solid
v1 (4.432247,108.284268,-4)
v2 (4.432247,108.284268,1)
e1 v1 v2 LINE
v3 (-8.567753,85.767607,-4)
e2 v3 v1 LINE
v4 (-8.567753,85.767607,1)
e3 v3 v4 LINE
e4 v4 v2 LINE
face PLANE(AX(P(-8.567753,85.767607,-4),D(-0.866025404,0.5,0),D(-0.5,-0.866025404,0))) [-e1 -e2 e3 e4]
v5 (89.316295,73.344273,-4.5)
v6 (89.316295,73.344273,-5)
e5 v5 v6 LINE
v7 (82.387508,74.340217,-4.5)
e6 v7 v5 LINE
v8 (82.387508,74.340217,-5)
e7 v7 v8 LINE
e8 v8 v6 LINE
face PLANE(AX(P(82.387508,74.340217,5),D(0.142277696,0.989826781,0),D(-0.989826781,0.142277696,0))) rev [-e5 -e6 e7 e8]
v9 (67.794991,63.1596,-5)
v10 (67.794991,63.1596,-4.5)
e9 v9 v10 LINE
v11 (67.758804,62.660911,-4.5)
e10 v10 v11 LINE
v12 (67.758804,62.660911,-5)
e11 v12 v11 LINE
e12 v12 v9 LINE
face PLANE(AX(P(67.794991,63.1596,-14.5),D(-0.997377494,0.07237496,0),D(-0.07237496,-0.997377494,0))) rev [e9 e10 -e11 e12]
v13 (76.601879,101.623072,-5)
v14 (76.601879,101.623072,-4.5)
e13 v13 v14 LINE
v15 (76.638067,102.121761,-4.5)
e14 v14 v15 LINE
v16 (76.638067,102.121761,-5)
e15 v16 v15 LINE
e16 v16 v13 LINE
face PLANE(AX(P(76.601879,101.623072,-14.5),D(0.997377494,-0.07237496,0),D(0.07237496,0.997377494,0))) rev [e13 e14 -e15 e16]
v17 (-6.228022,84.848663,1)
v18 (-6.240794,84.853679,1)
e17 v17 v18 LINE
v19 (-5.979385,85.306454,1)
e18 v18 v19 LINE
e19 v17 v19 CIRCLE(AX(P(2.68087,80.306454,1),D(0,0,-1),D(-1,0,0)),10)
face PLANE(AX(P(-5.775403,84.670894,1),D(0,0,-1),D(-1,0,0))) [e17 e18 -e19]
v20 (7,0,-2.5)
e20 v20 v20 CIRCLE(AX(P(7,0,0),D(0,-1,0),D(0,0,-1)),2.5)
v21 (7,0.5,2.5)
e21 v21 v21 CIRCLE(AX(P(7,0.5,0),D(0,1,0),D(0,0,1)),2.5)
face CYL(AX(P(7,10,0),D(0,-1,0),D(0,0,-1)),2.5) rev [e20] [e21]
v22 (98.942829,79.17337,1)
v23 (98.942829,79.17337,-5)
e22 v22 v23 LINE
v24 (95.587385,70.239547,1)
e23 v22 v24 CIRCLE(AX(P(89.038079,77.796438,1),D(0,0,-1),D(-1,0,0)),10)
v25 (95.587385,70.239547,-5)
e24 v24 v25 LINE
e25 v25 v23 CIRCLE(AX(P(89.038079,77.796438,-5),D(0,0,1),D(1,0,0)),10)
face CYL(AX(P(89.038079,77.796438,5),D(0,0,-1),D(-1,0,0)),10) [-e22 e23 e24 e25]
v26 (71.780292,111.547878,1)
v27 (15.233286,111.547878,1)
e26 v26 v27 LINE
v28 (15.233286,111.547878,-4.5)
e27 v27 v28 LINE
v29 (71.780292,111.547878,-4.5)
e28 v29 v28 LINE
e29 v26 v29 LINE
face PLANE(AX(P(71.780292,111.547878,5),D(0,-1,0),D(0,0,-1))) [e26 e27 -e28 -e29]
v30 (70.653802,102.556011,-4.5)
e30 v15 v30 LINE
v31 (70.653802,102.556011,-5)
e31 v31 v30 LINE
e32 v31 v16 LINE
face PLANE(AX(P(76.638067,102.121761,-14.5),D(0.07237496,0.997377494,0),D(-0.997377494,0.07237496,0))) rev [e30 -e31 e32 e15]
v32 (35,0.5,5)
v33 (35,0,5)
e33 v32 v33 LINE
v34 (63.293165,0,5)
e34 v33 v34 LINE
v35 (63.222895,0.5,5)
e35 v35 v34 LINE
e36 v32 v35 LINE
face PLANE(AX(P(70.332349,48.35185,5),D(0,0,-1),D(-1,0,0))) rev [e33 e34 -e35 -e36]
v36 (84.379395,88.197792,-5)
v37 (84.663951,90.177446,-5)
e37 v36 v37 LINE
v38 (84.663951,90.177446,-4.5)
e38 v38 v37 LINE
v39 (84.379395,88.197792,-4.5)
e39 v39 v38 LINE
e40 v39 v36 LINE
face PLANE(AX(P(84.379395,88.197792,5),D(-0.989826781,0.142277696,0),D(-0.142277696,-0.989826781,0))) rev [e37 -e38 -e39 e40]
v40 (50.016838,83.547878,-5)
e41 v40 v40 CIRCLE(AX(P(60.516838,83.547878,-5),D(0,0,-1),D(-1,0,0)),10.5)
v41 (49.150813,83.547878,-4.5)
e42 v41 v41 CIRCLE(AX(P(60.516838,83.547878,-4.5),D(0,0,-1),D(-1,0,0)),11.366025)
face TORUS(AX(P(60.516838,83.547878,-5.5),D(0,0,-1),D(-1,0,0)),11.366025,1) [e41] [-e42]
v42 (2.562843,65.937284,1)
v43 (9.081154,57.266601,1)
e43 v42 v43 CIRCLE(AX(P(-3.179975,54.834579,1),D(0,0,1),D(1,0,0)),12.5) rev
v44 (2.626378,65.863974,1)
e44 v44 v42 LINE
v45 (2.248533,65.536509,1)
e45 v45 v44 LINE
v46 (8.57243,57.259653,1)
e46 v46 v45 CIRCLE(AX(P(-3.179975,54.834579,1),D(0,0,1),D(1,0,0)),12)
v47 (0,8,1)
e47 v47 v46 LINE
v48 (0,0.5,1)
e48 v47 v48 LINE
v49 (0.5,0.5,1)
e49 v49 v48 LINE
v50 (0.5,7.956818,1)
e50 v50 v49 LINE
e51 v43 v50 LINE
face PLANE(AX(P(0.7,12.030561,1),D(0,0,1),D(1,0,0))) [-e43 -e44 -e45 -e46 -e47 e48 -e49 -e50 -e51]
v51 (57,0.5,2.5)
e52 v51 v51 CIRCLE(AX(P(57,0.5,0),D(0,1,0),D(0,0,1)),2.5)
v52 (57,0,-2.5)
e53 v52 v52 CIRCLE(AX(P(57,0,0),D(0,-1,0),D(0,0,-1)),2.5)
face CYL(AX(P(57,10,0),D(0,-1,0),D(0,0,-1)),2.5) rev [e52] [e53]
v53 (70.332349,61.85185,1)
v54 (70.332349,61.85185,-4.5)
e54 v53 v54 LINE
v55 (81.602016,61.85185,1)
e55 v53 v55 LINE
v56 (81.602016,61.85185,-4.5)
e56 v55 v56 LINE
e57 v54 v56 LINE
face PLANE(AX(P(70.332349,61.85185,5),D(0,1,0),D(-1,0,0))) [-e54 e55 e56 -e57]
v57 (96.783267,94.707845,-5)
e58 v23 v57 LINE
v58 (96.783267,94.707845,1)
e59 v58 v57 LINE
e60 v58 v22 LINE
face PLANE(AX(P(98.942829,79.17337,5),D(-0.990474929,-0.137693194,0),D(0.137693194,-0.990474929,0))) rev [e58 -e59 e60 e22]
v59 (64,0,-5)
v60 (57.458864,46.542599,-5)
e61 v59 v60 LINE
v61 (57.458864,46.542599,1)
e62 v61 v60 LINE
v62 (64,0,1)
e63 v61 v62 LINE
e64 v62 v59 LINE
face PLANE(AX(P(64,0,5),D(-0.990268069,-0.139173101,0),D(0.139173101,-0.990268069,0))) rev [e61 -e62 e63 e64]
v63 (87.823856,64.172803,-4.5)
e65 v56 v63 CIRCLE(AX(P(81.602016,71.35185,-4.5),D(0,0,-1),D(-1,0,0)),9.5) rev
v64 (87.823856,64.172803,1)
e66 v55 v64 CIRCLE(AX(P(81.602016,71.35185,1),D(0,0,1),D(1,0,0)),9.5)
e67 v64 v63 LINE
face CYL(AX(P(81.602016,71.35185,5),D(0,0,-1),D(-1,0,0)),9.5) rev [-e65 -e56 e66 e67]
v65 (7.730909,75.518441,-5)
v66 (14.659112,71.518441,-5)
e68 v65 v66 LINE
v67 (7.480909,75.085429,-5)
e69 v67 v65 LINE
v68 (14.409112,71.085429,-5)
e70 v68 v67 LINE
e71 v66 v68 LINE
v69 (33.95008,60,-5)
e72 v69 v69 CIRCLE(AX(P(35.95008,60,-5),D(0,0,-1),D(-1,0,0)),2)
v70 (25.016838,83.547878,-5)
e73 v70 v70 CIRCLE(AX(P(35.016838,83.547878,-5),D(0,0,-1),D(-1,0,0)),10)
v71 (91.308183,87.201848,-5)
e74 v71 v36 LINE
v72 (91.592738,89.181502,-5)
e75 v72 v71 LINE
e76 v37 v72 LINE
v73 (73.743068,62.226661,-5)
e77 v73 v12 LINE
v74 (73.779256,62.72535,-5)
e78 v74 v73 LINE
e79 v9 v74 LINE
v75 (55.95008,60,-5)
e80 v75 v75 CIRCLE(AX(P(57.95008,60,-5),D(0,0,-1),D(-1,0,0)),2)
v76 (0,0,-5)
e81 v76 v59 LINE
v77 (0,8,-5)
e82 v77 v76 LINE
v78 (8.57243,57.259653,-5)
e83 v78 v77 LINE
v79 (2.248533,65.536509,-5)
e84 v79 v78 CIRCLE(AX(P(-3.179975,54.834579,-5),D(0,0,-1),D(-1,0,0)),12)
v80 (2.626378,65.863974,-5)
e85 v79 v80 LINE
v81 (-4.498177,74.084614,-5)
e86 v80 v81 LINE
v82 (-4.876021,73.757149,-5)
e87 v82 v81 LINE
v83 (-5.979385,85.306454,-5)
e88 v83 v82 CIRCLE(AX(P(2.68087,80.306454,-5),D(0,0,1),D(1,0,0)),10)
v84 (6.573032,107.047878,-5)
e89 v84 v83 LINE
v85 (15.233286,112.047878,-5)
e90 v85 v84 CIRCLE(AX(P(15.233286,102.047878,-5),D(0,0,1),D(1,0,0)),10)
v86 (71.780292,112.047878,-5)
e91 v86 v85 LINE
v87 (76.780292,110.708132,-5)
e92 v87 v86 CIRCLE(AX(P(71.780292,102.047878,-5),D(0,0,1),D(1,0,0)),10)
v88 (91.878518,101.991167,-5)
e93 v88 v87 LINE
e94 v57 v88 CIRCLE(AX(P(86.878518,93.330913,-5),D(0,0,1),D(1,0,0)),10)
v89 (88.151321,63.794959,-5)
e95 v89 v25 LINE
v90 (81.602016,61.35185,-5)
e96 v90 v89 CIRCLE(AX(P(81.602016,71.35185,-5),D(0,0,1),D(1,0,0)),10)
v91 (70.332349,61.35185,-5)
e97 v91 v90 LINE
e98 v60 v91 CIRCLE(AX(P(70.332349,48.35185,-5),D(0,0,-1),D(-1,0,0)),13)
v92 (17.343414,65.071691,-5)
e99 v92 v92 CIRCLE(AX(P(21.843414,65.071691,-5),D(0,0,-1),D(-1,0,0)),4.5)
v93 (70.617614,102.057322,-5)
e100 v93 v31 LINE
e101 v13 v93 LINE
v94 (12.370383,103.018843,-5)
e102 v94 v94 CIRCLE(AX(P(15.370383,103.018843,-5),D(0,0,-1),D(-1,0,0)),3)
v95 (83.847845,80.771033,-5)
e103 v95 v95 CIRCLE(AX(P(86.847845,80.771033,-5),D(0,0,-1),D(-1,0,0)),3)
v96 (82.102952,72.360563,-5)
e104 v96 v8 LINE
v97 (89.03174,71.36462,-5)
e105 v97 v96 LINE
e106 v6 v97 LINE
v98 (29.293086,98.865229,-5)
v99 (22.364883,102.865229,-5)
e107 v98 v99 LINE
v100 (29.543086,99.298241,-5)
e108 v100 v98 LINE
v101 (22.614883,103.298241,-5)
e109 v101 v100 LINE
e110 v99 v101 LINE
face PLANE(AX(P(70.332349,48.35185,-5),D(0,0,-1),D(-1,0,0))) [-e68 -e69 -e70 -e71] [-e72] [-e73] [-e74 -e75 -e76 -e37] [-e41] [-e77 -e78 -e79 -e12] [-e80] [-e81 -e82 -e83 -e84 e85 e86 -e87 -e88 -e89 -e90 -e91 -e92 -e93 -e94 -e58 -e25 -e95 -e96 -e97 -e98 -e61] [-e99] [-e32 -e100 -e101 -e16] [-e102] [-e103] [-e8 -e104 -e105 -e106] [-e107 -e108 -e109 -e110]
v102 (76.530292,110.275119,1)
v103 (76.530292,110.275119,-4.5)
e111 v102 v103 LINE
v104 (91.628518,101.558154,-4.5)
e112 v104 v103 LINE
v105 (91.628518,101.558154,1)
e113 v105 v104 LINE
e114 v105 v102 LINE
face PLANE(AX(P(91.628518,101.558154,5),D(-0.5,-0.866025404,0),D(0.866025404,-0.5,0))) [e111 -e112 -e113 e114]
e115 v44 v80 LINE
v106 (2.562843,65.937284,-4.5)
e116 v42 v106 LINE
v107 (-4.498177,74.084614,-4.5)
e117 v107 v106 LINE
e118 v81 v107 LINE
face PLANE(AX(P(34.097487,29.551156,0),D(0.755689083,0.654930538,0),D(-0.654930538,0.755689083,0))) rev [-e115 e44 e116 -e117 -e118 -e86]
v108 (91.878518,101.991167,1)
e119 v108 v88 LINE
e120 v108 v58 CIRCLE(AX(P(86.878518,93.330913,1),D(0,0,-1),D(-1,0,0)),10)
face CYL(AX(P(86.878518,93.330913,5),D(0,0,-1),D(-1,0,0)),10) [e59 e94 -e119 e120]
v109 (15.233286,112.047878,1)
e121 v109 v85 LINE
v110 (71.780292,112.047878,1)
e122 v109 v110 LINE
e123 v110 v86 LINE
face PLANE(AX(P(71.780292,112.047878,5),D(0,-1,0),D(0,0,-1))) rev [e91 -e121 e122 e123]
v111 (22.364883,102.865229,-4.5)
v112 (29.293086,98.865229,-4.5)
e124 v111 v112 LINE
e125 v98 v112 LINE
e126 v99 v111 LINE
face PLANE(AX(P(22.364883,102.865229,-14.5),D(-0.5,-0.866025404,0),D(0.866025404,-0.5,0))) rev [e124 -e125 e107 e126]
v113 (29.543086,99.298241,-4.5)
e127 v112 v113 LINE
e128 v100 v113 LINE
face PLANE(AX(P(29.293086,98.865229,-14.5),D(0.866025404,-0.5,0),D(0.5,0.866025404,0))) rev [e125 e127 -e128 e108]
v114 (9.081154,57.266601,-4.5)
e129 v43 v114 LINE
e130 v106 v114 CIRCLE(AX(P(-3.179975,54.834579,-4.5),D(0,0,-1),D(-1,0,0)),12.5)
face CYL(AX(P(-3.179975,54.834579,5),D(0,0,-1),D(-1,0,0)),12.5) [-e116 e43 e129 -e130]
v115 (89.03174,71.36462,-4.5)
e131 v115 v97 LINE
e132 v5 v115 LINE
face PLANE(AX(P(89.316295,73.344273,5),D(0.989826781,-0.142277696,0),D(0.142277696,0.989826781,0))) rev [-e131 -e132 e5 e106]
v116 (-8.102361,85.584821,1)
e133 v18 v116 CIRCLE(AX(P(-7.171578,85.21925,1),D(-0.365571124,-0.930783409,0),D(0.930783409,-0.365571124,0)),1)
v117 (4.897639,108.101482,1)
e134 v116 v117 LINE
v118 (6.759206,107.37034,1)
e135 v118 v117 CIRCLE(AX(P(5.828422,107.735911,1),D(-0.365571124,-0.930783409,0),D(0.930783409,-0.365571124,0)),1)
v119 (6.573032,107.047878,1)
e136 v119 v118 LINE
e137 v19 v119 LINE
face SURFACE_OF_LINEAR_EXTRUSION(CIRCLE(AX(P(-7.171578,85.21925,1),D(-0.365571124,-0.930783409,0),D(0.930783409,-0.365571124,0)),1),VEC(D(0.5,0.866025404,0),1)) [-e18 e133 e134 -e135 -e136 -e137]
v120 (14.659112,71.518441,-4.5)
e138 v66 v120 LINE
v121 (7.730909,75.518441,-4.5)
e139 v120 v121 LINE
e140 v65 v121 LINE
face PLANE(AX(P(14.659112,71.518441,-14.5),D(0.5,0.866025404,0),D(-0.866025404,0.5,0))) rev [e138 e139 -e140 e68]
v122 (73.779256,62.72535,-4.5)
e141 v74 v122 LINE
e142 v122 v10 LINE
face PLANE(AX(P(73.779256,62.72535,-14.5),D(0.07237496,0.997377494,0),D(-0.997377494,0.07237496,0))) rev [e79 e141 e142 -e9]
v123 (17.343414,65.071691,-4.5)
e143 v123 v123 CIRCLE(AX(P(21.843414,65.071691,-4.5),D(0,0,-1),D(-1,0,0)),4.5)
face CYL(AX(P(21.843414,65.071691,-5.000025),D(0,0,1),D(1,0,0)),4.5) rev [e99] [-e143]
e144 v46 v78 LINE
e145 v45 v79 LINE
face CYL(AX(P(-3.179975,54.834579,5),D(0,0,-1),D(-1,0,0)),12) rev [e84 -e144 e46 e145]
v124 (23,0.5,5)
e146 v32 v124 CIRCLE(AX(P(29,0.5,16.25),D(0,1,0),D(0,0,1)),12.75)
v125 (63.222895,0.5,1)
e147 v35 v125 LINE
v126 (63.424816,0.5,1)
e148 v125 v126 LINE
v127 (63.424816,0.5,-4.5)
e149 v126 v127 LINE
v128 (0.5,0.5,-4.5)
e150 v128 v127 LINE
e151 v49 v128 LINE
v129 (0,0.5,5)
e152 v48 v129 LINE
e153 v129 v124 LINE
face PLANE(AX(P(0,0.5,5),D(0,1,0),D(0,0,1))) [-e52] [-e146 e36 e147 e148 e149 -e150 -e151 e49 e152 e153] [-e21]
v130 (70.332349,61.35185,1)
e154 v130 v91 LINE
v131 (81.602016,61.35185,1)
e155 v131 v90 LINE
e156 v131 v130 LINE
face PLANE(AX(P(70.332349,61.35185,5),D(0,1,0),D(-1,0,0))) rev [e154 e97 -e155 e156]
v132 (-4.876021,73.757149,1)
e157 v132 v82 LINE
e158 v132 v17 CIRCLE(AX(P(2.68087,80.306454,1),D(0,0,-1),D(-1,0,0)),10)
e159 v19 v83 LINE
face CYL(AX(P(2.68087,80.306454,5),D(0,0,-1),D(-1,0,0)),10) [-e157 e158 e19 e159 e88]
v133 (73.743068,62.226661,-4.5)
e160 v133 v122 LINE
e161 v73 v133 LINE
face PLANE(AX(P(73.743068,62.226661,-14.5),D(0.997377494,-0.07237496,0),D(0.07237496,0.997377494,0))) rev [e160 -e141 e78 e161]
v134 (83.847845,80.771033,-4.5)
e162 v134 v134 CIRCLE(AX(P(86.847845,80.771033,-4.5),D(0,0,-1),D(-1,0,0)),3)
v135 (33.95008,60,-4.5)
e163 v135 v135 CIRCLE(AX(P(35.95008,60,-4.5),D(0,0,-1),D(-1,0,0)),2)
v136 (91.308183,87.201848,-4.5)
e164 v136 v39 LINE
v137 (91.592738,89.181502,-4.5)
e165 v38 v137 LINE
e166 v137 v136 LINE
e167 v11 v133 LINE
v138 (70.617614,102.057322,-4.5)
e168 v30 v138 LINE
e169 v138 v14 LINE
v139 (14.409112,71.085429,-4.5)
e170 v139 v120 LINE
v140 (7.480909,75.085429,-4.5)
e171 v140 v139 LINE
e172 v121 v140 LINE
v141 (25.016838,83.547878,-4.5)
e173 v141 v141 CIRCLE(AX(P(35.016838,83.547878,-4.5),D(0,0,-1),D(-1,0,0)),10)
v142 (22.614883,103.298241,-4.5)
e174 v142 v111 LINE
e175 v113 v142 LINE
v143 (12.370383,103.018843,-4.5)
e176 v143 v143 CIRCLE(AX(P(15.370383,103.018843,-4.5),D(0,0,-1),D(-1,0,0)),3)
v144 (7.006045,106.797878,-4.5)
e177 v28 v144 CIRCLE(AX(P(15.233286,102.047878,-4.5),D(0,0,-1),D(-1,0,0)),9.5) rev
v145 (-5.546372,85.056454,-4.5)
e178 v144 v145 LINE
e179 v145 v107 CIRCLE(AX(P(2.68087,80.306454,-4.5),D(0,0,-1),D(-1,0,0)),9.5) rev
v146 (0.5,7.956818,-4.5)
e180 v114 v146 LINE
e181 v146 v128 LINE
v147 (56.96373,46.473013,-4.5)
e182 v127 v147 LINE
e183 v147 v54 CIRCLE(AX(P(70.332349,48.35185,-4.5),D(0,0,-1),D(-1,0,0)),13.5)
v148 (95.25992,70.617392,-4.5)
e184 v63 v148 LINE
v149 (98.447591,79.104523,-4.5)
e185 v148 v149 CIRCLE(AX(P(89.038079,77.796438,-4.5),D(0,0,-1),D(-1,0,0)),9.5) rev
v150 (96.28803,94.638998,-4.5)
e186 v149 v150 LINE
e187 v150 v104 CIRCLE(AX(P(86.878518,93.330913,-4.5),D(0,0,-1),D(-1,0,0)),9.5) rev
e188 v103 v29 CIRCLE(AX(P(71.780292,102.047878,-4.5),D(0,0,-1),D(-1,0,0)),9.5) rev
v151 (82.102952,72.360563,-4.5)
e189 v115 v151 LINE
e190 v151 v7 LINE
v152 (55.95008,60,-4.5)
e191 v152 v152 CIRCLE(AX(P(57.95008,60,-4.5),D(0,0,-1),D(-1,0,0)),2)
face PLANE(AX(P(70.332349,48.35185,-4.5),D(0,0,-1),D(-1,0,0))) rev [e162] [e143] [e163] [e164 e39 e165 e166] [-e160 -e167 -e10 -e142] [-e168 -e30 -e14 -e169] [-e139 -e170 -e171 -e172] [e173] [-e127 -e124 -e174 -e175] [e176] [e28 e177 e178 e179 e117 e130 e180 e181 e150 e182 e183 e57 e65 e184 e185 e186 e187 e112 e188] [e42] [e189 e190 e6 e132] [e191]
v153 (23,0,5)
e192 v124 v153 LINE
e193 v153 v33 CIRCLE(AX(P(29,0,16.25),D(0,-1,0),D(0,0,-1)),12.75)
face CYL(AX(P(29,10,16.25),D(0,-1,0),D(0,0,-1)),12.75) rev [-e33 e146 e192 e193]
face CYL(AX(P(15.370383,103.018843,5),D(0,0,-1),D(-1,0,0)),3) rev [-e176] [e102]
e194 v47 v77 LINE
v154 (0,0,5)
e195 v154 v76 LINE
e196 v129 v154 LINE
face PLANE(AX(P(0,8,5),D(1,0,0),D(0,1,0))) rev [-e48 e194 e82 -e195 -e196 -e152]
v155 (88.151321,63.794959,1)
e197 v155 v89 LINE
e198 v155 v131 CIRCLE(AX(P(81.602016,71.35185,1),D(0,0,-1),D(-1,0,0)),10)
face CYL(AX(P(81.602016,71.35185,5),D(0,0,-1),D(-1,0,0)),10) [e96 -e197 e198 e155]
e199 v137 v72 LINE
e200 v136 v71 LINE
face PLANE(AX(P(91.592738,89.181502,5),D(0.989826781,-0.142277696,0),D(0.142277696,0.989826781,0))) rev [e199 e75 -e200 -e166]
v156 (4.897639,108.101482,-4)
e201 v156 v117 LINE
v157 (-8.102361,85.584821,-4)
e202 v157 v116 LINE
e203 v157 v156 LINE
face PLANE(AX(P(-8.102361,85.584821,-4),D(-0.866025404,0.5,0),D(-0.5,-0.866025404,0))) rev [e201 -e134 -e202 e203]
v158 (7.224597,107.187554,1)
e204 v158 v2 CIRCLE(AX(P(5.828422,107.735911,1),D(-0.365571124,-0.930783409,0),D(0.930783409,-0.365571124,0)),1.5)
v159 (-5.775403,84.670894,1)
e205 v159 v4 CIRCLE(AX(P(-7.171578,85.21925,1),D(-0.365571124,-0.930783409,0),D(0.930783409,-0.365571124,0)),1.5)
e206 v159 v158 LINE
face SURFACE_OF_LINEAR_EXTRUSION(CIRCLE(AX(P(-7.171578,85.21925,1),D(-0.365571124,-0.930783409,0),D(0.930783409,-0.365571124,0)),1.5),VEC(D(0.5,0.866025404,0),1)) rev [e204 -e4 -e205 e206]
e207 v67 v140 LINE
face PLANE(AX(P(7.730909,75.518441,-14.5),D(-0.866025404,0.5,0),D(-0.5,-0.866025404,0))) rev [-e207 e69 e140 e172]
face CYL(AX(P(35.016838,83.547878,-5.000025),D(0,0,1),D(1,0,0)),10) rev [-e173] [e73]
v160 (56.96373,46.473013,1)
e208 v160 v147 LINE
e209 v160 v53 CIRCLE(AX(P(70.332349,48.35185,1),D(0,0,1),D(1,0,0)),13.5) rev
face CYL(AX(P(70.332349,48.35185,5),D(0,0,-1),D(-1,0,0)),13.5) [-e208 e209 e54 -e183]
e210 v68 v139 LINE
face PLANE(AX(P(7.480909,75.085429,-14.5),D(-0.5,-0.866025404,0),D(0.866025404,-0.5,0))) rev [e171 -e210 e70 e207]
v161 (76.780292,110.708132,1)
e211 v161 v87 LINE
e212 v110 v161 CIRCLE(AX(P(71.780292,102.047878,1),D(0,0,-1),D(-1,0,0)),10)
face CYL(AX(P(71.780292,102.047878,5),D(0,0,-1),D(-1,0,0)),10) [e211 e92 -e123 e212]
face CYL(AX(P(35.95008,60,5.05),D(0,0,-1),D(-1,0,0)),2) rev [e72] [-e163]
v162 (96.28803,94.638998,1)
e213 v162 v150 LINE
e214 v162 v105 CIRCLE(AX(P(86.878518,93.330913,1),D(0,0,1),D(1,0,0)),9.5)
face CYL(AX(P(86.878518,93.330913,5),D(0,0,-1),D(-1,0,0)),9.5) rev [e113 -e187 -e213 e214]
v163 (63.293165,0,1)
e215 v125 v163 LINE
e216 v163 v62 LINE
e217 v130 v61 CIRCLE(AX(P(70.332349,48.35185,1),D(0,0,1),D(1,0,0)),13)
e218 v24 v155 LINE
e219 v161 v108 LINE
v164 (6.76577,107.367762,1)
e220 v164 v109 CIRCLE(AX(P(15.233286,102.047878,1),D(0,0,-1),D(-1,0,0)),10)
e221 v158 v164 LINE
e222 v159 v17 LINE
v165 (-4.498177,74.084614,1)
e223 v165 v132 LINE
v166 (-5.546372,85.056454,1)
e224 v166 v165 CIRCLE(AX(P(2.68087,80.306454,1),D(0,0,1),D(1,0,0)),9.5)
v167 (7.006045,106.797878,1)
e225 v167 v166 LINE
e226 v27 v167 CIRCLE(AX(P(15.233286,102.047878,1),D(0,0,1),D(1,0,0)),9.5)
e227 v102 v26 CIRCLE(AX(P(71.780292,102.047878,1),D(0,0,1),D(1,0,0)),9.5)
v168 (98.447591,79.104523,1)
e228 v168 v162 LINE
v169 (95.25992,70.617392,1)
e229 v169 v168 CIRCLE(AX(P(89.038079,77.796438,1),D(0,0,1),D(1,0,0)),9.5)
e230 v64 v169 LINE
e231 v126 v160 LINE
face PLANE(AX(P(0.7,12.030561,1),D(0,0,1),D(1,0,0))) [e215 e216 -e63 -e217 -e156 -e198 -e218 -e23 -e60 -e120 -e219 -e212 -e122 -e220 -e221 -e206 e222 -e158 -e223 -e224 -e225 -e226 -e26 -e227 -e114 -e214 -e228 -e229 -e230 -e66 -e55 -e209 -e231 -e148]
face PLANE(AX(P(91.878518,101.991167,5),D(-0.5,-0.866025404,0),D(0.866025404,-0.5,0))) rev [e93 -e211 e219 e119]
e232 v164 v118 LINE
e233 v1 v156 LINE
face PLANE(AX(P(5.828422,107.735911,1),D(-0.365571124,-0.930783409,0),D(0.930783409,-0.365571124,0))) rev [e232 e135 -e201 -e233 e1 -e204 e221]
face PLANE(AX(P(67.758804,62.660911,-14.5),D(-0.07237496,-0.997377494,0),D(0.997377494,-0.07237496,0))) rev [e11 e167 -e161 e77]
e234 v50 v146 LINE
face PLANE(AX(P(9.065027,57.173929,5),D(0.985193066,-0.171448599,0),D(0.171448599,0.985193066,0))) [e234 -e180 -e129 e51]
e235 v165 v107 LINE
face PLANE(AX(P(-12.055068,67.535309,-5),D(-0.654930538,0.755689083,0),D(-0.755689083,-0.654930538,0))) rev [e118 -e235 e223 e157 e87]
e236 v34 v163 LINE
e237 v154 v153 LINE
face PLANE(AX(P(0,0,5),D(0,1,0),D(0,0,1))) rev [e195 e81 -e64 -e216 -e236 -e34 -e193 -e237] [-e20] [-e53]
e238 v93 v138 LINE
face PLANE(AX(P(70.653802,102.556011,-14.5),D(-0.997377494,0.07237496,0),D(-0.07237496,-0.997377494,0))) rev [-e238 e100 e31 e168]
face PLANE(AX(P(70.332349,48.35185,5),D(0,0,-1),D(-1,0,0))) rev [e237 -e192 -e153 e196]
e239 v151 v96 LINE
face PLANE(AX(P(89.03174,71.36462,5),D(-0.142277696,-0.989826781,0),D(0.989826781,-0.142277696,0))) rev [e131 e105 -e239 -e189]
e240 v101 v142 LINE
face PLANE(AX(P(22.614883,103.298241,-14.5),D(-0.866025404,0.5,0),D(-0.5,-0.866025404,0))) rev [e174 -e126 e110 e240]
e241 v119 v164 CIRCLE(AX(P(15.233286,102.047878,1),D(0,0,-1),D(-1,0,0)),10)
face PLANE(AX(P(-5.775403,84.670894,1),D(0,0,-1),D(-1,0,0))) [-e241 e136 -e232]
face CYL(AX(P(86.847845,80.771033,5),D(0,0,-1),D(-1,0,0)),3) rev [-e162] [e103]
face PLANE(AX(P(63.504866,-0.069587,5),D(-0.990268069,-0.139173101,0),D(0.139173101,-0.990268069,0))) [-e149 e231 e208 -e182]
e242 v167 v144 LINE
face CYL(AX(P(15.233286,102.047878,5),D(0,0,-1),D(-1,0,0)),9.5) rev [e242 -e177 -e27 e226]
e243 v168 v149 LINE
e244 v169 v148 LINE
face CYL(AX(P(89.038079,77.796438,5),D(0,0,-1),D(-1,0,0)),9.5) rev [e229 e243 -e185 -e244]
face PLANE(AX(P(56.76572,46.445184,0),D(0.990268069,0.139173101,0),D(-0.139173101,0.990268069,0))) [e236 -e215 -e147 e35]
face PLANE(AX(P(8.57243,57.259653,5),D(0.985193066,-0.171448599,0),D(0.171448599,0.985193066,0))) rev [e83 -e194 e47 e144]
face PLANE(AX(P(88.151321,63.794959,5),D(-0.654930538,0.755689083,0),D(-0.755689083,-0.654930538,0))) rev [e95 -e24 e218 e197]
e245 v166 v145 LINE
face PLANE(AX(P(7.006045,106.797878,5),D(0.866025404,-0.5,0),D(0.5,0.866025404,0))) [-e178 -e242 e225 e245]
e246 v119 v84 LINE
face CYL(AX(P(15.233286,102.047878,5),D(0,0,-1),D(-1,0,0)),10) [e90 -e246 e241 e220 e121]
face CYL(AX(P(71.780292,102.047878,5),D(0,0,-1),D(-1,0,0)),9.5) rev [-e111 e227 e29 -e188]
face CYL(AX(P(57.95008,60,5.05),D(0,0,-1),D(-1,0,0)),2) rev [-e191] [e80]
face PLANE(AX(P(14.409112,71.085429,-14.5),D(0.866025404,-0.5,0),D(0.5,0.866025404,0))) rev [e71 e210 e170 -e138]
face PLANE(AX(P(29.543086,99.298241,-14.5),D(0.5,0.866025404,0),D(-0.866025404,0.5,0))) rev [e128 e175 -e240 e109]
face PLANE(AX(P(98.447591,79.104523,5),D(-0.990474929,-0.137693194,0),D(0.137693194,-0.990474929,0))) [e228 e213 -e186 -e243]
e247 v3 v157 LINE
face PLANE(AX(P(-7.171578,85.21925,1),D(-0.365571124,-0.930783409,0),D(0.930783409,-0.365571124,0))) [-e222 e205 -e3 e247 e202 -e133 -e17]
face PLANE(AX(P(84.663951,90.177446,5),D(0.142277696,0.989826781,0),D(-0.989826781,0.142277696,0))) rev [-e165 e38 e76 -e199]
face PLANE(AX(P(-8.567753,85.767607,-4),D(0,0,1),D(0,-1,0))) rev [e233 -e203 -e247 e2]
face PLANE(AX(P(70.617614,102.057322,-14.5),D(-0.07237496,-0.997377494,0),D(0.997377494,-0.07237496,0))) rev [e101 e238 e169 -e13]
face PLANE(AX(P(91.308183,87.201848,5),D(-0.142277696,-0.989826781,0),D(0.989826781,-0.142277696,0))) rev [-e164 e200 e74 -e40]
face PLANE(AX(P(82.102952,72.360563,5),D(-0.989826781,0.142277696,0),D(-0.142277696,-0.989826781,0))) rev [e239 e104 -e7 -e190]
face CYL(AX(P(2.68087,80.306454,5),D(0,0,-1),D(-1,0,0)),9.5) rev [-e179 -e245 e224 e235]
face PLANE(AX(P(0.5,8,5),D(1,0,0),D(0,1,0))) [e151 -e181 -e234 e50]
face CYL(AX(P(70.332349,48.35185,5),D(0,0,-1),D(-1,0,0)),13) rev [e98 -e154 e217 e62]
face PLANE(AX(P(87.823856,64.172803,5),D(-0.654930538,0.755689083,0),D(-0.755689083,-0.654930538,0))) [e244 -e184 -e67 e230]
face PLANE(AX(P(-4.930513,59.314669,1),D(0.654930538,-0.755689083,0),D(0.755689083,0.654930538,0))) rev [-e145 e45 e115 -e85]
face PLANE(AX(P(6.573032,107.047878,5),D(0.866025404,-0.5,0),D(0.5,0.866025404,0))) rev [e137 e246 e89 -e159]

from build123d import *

# Parameters (mm, degrees)
BOSS_EXTRUDE1_DEPTH         = 5
SHELL1_T                    = -0.5
SKETCH4_R                   = 2.5
CUT_EXTRUDE4_DEPTH          = 10
CUT_SWEEP2_START            = 1
CUT_SWEEP2_DEPTH            = 4
SKETCH8_W                   = 6
SKETCH8_H                   = 10.878336181
CUT_EXTRUDE6_DEPTH          = 10
SKETCH11_R                  = 4.5
SKETCH11_R_2                = 10.5
SKETCH11_R_3                = 10
CUT_EXTRUDE7_DEPTH          = 150.877510373
FILLET1_R                   = 1
BOSS_EXTRUDE6_START         = 69.993050043
BOSS_EXTRUDE6_DEPTH         = 26.446393474
BOSS_EXTRUDE6_START_2       = -40
BOSS_EXTRUDE6_2_OUTLINE_W   = 1.69894254
BOSS_EXTRUDE6_2_OUTLINE_H   = 3
BOSS_EXTRUDE6_2_OUTLINE_W_2 = 1.590498846
BOSS_EXTRUDE6_2_OUTLINE_H_2 = 10
BOSS_EXTRUDE6_2_DEPTH       = 7.043773978
BOSS_EXTRUDE6_3_OUTLINE_W   = 1.69894254
BOSS_EXTRUDE6_3_OUTLINE_H   = 7
BOSS_EXTRUDE6_3_DEPTH       = 3.122658049
BOSS_EXTRUDE6_START_3       = -33.015543653
BOSS_EXTRUDE6_4_OUTLINE_W   = 1.590498846
BOSS_EXTRUDE6_4_OUTLINE_H   = 3
BOSS_EXTRUDE6_4_DEPTH       = 2.015543653
SKETCH17_R                  = 3
CUT_EXTRUDE8_DEPTH          = 10
CUT_EXTRUDE9_DEPTH          = 10
SKETCH19_R                  = 2
CUT_EXTRUDE10_DEPTH         = 150.877510373
CUT_EXTRUDE11_DEPTH         = 10


with BuildPart() as part:
    # Sketch1 → Boss-Extrude1 (new, symmetric)
    with BuildSketch(Plane.XY):
        with BuildLine():
            Line((0, 0), (64, 0))
            Line((64, 0), (57.458864255, 46.542599231))
            ThreePointArc((57.458864255, 46.542599231), (60.521124606, 56.88061692), (70.332349149, 61.351849543))
            Line((70.332349149, 61.351849543), (81.602015886, 61.351849543))
            ThreePointArc((81.602015886, 61.351849543), (85.0970904, 61.9825137), (88.15132127, 63.794958715))
            Line((88.15132127, 63.794958715), (95.587384775, 70.239547086))
            ThreePointArc((95.587384775, 70.239547086), (98.399557697, 74.280371374), (98.942828678, 79.173369852))
            Line((98.942828678, 79.173369852), (96.783267224, 94.707844854))
            ThreePointArc((96.783267224, 94.707844854), (95.173069343, 98.916646259), (91.878517937, 101.991166954))
            Line((91.878517937, 101.991166954), (76.780291664, 110.708131957))
            ThreePointArc((76.780291664, 110.708131957), (74.368482115, 111.707136182), (71.780291664, 112.047877919))
            Line((71.780291664, 112.047877919), (15.23328628, 112.047877919))
            ThreePointArc((15.23328628, 112.047877919), (10.23328628, 110.708131957), (6.573032242, 107.047877919))
            Line((6.573032242, 107.047877919), (-5.979384502, 85.30645436))
            ThreePointArc((-5.979384502, 85.30645436), (-7.273805779, 79.355434178), (-4.876021292, 73.757148976))
            Line((-4.876021292, 73.757148976), (2.24853328, 65.536509085))
            ThreePointArc((2.24853328, 65.536509085), (6.355355668, 62.120008219), (8.572429973, 57.259653311))
            Line((8.572429973, 57.259653311), (0, 8))
            Line((0, 8), (0, 0))
        make_face()
    extrude(amount=BOSS_EXTRUDE1_DEPTH, both=True)

    # Shell1
    shell1_openings = [part.faces().sort_by_distance(p)[0] for p in [
        (40.493150865, 62.038987827, 5),
    ]]
    offset(amount=SHELL1_T, openings=shell1_openings, kind=Kind.INTERSECTION)

    # Sketch4 → Cut-Extrude4 (cut)
    with BuildSketch(Plane.XZ):
        with Locations(Location((7, 0, 0), (0, 0, 270))):
            Circle(SKETCH4_R)
        with Locations(Location((57, 0, 0), (0, 0, 270))):
            Circle(SKETCH4_R)
        with BuildLine():
            Line((23, 5), (35, 5))
            ThreePointArc((35, 5), (29, 3.5), (23, 5))
        make_face()
    extrude(amount=-CUT_EXTRUDE4_DEPTH, mode=Mode.SUBTRACT)

    # Cut-Sweep2: read off the stored shape, not the designer's step
    # Cut-Sweep2 outline → Cut-Sweep2 (cut)
    with BuildSketch(Plane.XY.offset(CUT_SWEEP2_START)):
        with BuildLine():
            Line((63.222895016, 0.5), (63.293165433, 0))
            Line((63.293165433, 0), (64, 0))
            Line((64, 0), (57.458864255, 46.542599231))
            ThreePointArc((57.458864255, 46.542599231), (60.521124606, 56.88061692), (70.332349149, 61.351849543))
            Line((70.332349149, 61.351849543), (81.602015886, 61.351849543))
            ThreePointArc((81.602015886, 61.351849543), (85.0970904, 61.9825137), (88.15132127, 63.794958715))
            Line((88.15132127, 63.794958715), (95.587384775, 70.239547086))
            ThreePointArc((95.587384775, 70.239547086), (98.399557697, 74.280371374), (98.942828678, 79.173369852))
            Line((98.942828678, 79.173369852), (96.783267224, 94.707844854))
            ThreePointArc((96.783267224, 94.707844854), (95.173069343, 98.916646258), (91.878517937, 101.991166954))
            Line((91.878517937, 101.991166954), (76.780291664, 110.708131957))
            ThreePointArc((76.780291664, 110.708131957), (74.368482115, 111.707136182), (71.780291664, 112.047877919))
            Line((71.780291664, 112.047877919), (15.23328628, 112.047877919))
            ThreePointArc((15.23328628, 112.047877919), (10.23328628, 110.708131957), (6.573032242, 107.047877919))
            Line((6.573032242, 107.047877919), (-5.979384502, 85.30645436))
            ThreePointArc((-5.979384502, 85.30645436), (-7.273805779, 79.355434178), (-4.876021292, 73.757148976))
            Line((-4.876021292, 73.757148976), (2.24853328, 65.536509085))
            ThreePointArc((2.24853328, 65.536509085), (6.355355668, 62.120008219), (8.572429973, 57.259653311))
            Line((8.572429973, 57.259653311), (0, 8))
            Line((0, 8), (0, 0.5))
            Line((0, 0.5), (0.5, 0.5))
            Line((0.5, 0.5), (0.5, 7.956818155))
            Line((0.5, 7.956818155), (9.081153751, 57.266600812))
            ThreePointArc((9.081153751, 57.266600812), (6.811556982, 62.345857113), (2.562843108, 65.937283639))
            Line((2.562843108, 65.937283639), (-4.498176751, 74.084614245))
            ThreePointArc((-4.498176751, 74.084614245), (-6.776072013, 79.402985187), (-5.5463718, 85.05645436))
            Line((-5.5463718, 85.05645436), (7.006044944, 106.797877919))
            ThreePointArc((7.006044944, 106.797877919), (10.48328628, 110.275119255), (15.23328628, 111.547877919))
            Line((15.23328628, 111.547877919), (71.780291664, 111.547877919))
            ThreePointArc((71.780291664, 111.547877919), (74.239072592, 111.224173269), (76.530291664, 110.275119255))
            Line((76.530291664, 110.275119255), (91.628517937, 101.558154252))
            ThreePointArc((91.628517937, 101.558154252), (94.758341773, 98.637359591), (96.28802976, 94.638998257))
            Line((96.28802976, 94.638998257), (98.447591213, 79.104523255))
            ThreePointArc((98.447591213, 79.104523255), (97.931483782, 74.456174701), (95.259919506, 70.617391628))
            Line((95.259919506, 70.617391628), (87.823856001, 64.172803257))
            ThreePointArc((87.823856001, 64.172803257), (84.922336675, 62.450980492), (81.602015886, 61.851849543))
            Line((81.602015886, 61.851849543), (70.332349149, 61.851849543))
            ThreePointArc((70.332349149, 61.851849543), (60.143769816, 57.208646435), (56.963730221, 46.47301268))
            Line((56.963730221, 46.47301268), (63.424815796, 0.5))
            Line((63.424815796, 0.5), (63.222895016, 0.5))
        make_face()
    extrude(amount=CUT_SWEEP2_DEPTH, mode=Mode.SUBTRACT)

    # Sketch8 → Cut-Extrude6 (cut)
    with BuildSketch(Plane(origin=(34.097487332, 29.551155688, 0), x_dir=(0, 0, -1), z_dir=(0.7556890827898172, 0.6549305384178423, 0))):
        with Locations((2, 53.491759419)):
            Rectangle(SKETCH8_W, SKETCH8_H)
    extrude(amount=-CUT_EXTRUDE6_DEPTH, mode=Mode.SUBTRACT)

    # Sketch11 → Cut-Extrude7 (cut, through all)
    with BuildSketch(Plane.XY.offset(5)):
        with Locations(Location((21.843413851, 65.071690598, 0), (0, 0, 180))):
            Circle(SKETCH11_R)
        with Locations(Location((60.516838143, 83.547877919, 0), (0, 0, 180))):
            Circle(SKETCH11_R_2)
        with Locations(Location((35.016838143, 83.547877919, 0), (0, 0, 180))):
            Circle(SKETCH11_R_3)
    extrude(amount=-CUT_EXTRUDE7_DEPTH, mode=Mode.SUBTRACT)

    # Fillet1
    # the kernel refuses this fillet: 1 mm, written as the material it takes off along each edge
    with BuildSketch(Plane(origin=(60.516838143, 83.547877919, -4.5), x_dir=(-1, 0, 0), z_dir=(0, 1, 0))) as fillet1_piece_1:
        with BuildLine():
            CenterArc((11.366025404, -1), FILLET1_R, 90, 60)
            Line((11.366025404, 0), (11.366025404, 0.02))
            Line((11.366025404, 0.02), (10.5, 0.02))
            Line((10.5, 0.02), (10.48, 0))
            ThreePointArc((10.48, 0), (10.48, -0.25), (10.482679492, -0.49))
            Line((10.482679492, -0.49), (10.5, -0.5))
        make_face()
    revolve(axis=Axis((60.516838143, 83.547877919, -4.5), (0, 0, 1)), mode=Mode.SUBTRACT)

    # Boss-Extrude6: read off the stored shape, not the designer's step
    # Boss-Extrude6 outline → Boss-Extrude6 (add)
    with BuildSketch(Plane(origin=(0, 0, 0), x_dir=(0.8660254037844399, -0.4999999999999979, 0), z_dir=(0.4999999999999979, 0.8660254037844398, 0)).offset(BOSS_EXTRUDE6_START)):
        with BuildLine():
            add(Edge.make_bspline(
                [(-47.337092239, -1), (-47.337092239, -2.5), (-48.820393697, -2.5), (-50.303695156, -2.5), (-50.303695156, -1)],
                knots=[0, 0, 0, 1.570796327, 1.570796327, 3.141592654, 3.141592654, 3.141592654], degree=2, weights=[1, 0.707106781, 1, 0.707106781, 1]))
            Line((-47.337092239, -1), (-47.831526058, -1))
            add(Edge.make_bspline(
                [(-47.831526058, -1), (-47.831526058, -2), (-48.820393697, -2), (-49.809261336, -2), (-49.809261336, -1)],
                knots=[0, 0, 0, 1.570796327, 1.570796327, 3.141592654, 3.141592654, 3.141592654], degree=2, weights=[1, 0.707106781, 1, 0.707106781, 1]))
            Line((-49.809261336, -1), (-49.809261336, 4))
            Line((-49.809261336, 4), (-50.303695156, 4))
            Line((-50.303695156, 4), (-50.303695156, -1))
        make_face()
    extrude(amount=BOSS_EXTRUDE6_DEPTH)

    # Boss-Extrude6 2 outline → Boss-Extrude6 2 (cut)
    with BuildSketch(Plane(origin=(0, 0, 0), x_dir=(0.365571123575949, 0.9307834085368187, 0), z_dir=(0.9307834085368187, -0.36557112357594895, 0)).offset(BOSS_EXTRUDE6_START_2)):
        with Locations((75.84947127, 2.5)):
            Rectangle(BOSS_EXTRUDE6_2_OUTLINE_W, BOSS_EXTRUDE6_2_OUTLINE_H)
        with Locations((103.204750577, -1)):
            Rectangle(BOSS_EXTRUDE6_2_OUTLINE_W_2, BOSS_EXTRUDE6_2_OUTLINE_H_2)
    extrude(amount=BOSS_EXTRUDE6_2_DEPTH, mode=Mode.SUBTRACT)

    # Boss-Extrude6 3 outline → Boss-Extrude6 3 (cut)
    with BuildSketch(Plane(origin=(0, 0, 0), x_dir=(0.365571123575949, 0.9307834085368187, 0), z_dir=(0.9307834085368187, -0.36557112357594895, 0)).offset(BOSS_EXTRUDE6_START_2)):
        with Locations((75.84947127, -2.5)):
            Rectangle(BOSS_EXTRUDE6_3_OUTLINE_W, BOSS_EXTRUDE6_3_OUTLINE_H)
    extrude(amount=BOSS_EXTRUDE6_3_DEPTH, mode=Mode.SUBTRACT)

    # Boss-Extrude6 4 outline → Boss-Extrude6 4 (cut)
    with BuildSketch(Plane(origin=(0, 0, 0), x_dir=(0.365571123575949, 0.9307834085368187, 0), z_dir=(0.9307834085368187, -0.36557112357594895, 0)).offset(BOSS_EXTRUDE6_START_3)):
        with Locations((103.204750577, 2.5)):
            Rectangle(BOSS_EXTRUDE6_4_OUTLINE_W, BOSS_EXTRUDE6_4_OUTLINE_H)
    extrude(amount=BOSS_EXTRUDE6_4_DEPTH, mode=Mode.SUBTRACT)

    # Sketch17 → Cut-Extrude8 (cut)
    with BuildSketch(Plane(origin=(0, 0, -5), x_dir=(-1, 0, 0), z_dir=(0, 0, -1))):
        with Locations((-86.847845229, 80.771032583)):
            Circle(SKETCH17_R)
        with Locations((-15.370383265, 103.018842591)):
            Circle(SKETCH17_R)
    extrude(amount=-CUT_EXTRUDE8_DEPTH, mode=Mode.SUBTRACT)

    # Sketch18 → Cut-Extrude9 (cut)
    with BuildSketch(Plane.XY.offset(-4.5)):
        Polygon((67.794990984, 63.159599672), (67.758803504, 62.660910926), (73.743068466, 62.226661163), (73.779255946, 62.72534991), align=None)
        Polygon((76.601879403, 101.623072167), (76.638066884, 102.121760914), (70.653801921, 102.556010677), (70.617614441, 102.05732193), align=None)
        Polygon((22.614883225, 103.298241446), (22.364883225, 102.865228744), (29.293086455, 98.865228744), (29.543086455, 99.298241446), align=None)
        Polygon((14.659111859, 71.518441227), (7.730908628, 75.518441227), (7.480908628, 75.085428525), (14.409111859, 71.085428525), align=None)
    extrude(amount=-CUT_EXTRUDE9_DEPTH, mode=Mode.SUBTRACT)

    # Sketch19 → Cut-Extrude10 (cut, through all)
    with BuildSketch(Plane(origin=(0, 0, -5), x_dir=(-1, 0, 0), z_dir=(0, 0, -1))):
        with Locations((-57.950079932, 60)):
            Circle(SKETCH19_R)
        with Locations((-35.950079932, 60)):
            Circle(SKETCH19_R)
    extrude(amount=-CUT_EXTRUDE10_DEPTH, mode=Mode.SUBTRACT)

    # Sketch20 → Cut-Extrude11 (cut)
    with BuildSketch(Plane(origin=(0, 0, -5), x_dir=(-1, 0, 0), z_dir=(0, 0, -1))):
        Polygon((-91.592738232, 89.181501678), (-91.308182839, 87.201848115), (-84.379395369, 88.19779199), (-84.663950762, 90.177445553), align=None)
        Polygon((-89.316295089, 73.344273176), (-89.031739697, 71.364619614), (-82.102952227, 72.360563488), (-82.38750762, 74.340217051), align=None)
    extrude(amount=-CUT_EXTRUDE11_DEPTH, mode=Mode.SUBTRACT)


solid = part.part
